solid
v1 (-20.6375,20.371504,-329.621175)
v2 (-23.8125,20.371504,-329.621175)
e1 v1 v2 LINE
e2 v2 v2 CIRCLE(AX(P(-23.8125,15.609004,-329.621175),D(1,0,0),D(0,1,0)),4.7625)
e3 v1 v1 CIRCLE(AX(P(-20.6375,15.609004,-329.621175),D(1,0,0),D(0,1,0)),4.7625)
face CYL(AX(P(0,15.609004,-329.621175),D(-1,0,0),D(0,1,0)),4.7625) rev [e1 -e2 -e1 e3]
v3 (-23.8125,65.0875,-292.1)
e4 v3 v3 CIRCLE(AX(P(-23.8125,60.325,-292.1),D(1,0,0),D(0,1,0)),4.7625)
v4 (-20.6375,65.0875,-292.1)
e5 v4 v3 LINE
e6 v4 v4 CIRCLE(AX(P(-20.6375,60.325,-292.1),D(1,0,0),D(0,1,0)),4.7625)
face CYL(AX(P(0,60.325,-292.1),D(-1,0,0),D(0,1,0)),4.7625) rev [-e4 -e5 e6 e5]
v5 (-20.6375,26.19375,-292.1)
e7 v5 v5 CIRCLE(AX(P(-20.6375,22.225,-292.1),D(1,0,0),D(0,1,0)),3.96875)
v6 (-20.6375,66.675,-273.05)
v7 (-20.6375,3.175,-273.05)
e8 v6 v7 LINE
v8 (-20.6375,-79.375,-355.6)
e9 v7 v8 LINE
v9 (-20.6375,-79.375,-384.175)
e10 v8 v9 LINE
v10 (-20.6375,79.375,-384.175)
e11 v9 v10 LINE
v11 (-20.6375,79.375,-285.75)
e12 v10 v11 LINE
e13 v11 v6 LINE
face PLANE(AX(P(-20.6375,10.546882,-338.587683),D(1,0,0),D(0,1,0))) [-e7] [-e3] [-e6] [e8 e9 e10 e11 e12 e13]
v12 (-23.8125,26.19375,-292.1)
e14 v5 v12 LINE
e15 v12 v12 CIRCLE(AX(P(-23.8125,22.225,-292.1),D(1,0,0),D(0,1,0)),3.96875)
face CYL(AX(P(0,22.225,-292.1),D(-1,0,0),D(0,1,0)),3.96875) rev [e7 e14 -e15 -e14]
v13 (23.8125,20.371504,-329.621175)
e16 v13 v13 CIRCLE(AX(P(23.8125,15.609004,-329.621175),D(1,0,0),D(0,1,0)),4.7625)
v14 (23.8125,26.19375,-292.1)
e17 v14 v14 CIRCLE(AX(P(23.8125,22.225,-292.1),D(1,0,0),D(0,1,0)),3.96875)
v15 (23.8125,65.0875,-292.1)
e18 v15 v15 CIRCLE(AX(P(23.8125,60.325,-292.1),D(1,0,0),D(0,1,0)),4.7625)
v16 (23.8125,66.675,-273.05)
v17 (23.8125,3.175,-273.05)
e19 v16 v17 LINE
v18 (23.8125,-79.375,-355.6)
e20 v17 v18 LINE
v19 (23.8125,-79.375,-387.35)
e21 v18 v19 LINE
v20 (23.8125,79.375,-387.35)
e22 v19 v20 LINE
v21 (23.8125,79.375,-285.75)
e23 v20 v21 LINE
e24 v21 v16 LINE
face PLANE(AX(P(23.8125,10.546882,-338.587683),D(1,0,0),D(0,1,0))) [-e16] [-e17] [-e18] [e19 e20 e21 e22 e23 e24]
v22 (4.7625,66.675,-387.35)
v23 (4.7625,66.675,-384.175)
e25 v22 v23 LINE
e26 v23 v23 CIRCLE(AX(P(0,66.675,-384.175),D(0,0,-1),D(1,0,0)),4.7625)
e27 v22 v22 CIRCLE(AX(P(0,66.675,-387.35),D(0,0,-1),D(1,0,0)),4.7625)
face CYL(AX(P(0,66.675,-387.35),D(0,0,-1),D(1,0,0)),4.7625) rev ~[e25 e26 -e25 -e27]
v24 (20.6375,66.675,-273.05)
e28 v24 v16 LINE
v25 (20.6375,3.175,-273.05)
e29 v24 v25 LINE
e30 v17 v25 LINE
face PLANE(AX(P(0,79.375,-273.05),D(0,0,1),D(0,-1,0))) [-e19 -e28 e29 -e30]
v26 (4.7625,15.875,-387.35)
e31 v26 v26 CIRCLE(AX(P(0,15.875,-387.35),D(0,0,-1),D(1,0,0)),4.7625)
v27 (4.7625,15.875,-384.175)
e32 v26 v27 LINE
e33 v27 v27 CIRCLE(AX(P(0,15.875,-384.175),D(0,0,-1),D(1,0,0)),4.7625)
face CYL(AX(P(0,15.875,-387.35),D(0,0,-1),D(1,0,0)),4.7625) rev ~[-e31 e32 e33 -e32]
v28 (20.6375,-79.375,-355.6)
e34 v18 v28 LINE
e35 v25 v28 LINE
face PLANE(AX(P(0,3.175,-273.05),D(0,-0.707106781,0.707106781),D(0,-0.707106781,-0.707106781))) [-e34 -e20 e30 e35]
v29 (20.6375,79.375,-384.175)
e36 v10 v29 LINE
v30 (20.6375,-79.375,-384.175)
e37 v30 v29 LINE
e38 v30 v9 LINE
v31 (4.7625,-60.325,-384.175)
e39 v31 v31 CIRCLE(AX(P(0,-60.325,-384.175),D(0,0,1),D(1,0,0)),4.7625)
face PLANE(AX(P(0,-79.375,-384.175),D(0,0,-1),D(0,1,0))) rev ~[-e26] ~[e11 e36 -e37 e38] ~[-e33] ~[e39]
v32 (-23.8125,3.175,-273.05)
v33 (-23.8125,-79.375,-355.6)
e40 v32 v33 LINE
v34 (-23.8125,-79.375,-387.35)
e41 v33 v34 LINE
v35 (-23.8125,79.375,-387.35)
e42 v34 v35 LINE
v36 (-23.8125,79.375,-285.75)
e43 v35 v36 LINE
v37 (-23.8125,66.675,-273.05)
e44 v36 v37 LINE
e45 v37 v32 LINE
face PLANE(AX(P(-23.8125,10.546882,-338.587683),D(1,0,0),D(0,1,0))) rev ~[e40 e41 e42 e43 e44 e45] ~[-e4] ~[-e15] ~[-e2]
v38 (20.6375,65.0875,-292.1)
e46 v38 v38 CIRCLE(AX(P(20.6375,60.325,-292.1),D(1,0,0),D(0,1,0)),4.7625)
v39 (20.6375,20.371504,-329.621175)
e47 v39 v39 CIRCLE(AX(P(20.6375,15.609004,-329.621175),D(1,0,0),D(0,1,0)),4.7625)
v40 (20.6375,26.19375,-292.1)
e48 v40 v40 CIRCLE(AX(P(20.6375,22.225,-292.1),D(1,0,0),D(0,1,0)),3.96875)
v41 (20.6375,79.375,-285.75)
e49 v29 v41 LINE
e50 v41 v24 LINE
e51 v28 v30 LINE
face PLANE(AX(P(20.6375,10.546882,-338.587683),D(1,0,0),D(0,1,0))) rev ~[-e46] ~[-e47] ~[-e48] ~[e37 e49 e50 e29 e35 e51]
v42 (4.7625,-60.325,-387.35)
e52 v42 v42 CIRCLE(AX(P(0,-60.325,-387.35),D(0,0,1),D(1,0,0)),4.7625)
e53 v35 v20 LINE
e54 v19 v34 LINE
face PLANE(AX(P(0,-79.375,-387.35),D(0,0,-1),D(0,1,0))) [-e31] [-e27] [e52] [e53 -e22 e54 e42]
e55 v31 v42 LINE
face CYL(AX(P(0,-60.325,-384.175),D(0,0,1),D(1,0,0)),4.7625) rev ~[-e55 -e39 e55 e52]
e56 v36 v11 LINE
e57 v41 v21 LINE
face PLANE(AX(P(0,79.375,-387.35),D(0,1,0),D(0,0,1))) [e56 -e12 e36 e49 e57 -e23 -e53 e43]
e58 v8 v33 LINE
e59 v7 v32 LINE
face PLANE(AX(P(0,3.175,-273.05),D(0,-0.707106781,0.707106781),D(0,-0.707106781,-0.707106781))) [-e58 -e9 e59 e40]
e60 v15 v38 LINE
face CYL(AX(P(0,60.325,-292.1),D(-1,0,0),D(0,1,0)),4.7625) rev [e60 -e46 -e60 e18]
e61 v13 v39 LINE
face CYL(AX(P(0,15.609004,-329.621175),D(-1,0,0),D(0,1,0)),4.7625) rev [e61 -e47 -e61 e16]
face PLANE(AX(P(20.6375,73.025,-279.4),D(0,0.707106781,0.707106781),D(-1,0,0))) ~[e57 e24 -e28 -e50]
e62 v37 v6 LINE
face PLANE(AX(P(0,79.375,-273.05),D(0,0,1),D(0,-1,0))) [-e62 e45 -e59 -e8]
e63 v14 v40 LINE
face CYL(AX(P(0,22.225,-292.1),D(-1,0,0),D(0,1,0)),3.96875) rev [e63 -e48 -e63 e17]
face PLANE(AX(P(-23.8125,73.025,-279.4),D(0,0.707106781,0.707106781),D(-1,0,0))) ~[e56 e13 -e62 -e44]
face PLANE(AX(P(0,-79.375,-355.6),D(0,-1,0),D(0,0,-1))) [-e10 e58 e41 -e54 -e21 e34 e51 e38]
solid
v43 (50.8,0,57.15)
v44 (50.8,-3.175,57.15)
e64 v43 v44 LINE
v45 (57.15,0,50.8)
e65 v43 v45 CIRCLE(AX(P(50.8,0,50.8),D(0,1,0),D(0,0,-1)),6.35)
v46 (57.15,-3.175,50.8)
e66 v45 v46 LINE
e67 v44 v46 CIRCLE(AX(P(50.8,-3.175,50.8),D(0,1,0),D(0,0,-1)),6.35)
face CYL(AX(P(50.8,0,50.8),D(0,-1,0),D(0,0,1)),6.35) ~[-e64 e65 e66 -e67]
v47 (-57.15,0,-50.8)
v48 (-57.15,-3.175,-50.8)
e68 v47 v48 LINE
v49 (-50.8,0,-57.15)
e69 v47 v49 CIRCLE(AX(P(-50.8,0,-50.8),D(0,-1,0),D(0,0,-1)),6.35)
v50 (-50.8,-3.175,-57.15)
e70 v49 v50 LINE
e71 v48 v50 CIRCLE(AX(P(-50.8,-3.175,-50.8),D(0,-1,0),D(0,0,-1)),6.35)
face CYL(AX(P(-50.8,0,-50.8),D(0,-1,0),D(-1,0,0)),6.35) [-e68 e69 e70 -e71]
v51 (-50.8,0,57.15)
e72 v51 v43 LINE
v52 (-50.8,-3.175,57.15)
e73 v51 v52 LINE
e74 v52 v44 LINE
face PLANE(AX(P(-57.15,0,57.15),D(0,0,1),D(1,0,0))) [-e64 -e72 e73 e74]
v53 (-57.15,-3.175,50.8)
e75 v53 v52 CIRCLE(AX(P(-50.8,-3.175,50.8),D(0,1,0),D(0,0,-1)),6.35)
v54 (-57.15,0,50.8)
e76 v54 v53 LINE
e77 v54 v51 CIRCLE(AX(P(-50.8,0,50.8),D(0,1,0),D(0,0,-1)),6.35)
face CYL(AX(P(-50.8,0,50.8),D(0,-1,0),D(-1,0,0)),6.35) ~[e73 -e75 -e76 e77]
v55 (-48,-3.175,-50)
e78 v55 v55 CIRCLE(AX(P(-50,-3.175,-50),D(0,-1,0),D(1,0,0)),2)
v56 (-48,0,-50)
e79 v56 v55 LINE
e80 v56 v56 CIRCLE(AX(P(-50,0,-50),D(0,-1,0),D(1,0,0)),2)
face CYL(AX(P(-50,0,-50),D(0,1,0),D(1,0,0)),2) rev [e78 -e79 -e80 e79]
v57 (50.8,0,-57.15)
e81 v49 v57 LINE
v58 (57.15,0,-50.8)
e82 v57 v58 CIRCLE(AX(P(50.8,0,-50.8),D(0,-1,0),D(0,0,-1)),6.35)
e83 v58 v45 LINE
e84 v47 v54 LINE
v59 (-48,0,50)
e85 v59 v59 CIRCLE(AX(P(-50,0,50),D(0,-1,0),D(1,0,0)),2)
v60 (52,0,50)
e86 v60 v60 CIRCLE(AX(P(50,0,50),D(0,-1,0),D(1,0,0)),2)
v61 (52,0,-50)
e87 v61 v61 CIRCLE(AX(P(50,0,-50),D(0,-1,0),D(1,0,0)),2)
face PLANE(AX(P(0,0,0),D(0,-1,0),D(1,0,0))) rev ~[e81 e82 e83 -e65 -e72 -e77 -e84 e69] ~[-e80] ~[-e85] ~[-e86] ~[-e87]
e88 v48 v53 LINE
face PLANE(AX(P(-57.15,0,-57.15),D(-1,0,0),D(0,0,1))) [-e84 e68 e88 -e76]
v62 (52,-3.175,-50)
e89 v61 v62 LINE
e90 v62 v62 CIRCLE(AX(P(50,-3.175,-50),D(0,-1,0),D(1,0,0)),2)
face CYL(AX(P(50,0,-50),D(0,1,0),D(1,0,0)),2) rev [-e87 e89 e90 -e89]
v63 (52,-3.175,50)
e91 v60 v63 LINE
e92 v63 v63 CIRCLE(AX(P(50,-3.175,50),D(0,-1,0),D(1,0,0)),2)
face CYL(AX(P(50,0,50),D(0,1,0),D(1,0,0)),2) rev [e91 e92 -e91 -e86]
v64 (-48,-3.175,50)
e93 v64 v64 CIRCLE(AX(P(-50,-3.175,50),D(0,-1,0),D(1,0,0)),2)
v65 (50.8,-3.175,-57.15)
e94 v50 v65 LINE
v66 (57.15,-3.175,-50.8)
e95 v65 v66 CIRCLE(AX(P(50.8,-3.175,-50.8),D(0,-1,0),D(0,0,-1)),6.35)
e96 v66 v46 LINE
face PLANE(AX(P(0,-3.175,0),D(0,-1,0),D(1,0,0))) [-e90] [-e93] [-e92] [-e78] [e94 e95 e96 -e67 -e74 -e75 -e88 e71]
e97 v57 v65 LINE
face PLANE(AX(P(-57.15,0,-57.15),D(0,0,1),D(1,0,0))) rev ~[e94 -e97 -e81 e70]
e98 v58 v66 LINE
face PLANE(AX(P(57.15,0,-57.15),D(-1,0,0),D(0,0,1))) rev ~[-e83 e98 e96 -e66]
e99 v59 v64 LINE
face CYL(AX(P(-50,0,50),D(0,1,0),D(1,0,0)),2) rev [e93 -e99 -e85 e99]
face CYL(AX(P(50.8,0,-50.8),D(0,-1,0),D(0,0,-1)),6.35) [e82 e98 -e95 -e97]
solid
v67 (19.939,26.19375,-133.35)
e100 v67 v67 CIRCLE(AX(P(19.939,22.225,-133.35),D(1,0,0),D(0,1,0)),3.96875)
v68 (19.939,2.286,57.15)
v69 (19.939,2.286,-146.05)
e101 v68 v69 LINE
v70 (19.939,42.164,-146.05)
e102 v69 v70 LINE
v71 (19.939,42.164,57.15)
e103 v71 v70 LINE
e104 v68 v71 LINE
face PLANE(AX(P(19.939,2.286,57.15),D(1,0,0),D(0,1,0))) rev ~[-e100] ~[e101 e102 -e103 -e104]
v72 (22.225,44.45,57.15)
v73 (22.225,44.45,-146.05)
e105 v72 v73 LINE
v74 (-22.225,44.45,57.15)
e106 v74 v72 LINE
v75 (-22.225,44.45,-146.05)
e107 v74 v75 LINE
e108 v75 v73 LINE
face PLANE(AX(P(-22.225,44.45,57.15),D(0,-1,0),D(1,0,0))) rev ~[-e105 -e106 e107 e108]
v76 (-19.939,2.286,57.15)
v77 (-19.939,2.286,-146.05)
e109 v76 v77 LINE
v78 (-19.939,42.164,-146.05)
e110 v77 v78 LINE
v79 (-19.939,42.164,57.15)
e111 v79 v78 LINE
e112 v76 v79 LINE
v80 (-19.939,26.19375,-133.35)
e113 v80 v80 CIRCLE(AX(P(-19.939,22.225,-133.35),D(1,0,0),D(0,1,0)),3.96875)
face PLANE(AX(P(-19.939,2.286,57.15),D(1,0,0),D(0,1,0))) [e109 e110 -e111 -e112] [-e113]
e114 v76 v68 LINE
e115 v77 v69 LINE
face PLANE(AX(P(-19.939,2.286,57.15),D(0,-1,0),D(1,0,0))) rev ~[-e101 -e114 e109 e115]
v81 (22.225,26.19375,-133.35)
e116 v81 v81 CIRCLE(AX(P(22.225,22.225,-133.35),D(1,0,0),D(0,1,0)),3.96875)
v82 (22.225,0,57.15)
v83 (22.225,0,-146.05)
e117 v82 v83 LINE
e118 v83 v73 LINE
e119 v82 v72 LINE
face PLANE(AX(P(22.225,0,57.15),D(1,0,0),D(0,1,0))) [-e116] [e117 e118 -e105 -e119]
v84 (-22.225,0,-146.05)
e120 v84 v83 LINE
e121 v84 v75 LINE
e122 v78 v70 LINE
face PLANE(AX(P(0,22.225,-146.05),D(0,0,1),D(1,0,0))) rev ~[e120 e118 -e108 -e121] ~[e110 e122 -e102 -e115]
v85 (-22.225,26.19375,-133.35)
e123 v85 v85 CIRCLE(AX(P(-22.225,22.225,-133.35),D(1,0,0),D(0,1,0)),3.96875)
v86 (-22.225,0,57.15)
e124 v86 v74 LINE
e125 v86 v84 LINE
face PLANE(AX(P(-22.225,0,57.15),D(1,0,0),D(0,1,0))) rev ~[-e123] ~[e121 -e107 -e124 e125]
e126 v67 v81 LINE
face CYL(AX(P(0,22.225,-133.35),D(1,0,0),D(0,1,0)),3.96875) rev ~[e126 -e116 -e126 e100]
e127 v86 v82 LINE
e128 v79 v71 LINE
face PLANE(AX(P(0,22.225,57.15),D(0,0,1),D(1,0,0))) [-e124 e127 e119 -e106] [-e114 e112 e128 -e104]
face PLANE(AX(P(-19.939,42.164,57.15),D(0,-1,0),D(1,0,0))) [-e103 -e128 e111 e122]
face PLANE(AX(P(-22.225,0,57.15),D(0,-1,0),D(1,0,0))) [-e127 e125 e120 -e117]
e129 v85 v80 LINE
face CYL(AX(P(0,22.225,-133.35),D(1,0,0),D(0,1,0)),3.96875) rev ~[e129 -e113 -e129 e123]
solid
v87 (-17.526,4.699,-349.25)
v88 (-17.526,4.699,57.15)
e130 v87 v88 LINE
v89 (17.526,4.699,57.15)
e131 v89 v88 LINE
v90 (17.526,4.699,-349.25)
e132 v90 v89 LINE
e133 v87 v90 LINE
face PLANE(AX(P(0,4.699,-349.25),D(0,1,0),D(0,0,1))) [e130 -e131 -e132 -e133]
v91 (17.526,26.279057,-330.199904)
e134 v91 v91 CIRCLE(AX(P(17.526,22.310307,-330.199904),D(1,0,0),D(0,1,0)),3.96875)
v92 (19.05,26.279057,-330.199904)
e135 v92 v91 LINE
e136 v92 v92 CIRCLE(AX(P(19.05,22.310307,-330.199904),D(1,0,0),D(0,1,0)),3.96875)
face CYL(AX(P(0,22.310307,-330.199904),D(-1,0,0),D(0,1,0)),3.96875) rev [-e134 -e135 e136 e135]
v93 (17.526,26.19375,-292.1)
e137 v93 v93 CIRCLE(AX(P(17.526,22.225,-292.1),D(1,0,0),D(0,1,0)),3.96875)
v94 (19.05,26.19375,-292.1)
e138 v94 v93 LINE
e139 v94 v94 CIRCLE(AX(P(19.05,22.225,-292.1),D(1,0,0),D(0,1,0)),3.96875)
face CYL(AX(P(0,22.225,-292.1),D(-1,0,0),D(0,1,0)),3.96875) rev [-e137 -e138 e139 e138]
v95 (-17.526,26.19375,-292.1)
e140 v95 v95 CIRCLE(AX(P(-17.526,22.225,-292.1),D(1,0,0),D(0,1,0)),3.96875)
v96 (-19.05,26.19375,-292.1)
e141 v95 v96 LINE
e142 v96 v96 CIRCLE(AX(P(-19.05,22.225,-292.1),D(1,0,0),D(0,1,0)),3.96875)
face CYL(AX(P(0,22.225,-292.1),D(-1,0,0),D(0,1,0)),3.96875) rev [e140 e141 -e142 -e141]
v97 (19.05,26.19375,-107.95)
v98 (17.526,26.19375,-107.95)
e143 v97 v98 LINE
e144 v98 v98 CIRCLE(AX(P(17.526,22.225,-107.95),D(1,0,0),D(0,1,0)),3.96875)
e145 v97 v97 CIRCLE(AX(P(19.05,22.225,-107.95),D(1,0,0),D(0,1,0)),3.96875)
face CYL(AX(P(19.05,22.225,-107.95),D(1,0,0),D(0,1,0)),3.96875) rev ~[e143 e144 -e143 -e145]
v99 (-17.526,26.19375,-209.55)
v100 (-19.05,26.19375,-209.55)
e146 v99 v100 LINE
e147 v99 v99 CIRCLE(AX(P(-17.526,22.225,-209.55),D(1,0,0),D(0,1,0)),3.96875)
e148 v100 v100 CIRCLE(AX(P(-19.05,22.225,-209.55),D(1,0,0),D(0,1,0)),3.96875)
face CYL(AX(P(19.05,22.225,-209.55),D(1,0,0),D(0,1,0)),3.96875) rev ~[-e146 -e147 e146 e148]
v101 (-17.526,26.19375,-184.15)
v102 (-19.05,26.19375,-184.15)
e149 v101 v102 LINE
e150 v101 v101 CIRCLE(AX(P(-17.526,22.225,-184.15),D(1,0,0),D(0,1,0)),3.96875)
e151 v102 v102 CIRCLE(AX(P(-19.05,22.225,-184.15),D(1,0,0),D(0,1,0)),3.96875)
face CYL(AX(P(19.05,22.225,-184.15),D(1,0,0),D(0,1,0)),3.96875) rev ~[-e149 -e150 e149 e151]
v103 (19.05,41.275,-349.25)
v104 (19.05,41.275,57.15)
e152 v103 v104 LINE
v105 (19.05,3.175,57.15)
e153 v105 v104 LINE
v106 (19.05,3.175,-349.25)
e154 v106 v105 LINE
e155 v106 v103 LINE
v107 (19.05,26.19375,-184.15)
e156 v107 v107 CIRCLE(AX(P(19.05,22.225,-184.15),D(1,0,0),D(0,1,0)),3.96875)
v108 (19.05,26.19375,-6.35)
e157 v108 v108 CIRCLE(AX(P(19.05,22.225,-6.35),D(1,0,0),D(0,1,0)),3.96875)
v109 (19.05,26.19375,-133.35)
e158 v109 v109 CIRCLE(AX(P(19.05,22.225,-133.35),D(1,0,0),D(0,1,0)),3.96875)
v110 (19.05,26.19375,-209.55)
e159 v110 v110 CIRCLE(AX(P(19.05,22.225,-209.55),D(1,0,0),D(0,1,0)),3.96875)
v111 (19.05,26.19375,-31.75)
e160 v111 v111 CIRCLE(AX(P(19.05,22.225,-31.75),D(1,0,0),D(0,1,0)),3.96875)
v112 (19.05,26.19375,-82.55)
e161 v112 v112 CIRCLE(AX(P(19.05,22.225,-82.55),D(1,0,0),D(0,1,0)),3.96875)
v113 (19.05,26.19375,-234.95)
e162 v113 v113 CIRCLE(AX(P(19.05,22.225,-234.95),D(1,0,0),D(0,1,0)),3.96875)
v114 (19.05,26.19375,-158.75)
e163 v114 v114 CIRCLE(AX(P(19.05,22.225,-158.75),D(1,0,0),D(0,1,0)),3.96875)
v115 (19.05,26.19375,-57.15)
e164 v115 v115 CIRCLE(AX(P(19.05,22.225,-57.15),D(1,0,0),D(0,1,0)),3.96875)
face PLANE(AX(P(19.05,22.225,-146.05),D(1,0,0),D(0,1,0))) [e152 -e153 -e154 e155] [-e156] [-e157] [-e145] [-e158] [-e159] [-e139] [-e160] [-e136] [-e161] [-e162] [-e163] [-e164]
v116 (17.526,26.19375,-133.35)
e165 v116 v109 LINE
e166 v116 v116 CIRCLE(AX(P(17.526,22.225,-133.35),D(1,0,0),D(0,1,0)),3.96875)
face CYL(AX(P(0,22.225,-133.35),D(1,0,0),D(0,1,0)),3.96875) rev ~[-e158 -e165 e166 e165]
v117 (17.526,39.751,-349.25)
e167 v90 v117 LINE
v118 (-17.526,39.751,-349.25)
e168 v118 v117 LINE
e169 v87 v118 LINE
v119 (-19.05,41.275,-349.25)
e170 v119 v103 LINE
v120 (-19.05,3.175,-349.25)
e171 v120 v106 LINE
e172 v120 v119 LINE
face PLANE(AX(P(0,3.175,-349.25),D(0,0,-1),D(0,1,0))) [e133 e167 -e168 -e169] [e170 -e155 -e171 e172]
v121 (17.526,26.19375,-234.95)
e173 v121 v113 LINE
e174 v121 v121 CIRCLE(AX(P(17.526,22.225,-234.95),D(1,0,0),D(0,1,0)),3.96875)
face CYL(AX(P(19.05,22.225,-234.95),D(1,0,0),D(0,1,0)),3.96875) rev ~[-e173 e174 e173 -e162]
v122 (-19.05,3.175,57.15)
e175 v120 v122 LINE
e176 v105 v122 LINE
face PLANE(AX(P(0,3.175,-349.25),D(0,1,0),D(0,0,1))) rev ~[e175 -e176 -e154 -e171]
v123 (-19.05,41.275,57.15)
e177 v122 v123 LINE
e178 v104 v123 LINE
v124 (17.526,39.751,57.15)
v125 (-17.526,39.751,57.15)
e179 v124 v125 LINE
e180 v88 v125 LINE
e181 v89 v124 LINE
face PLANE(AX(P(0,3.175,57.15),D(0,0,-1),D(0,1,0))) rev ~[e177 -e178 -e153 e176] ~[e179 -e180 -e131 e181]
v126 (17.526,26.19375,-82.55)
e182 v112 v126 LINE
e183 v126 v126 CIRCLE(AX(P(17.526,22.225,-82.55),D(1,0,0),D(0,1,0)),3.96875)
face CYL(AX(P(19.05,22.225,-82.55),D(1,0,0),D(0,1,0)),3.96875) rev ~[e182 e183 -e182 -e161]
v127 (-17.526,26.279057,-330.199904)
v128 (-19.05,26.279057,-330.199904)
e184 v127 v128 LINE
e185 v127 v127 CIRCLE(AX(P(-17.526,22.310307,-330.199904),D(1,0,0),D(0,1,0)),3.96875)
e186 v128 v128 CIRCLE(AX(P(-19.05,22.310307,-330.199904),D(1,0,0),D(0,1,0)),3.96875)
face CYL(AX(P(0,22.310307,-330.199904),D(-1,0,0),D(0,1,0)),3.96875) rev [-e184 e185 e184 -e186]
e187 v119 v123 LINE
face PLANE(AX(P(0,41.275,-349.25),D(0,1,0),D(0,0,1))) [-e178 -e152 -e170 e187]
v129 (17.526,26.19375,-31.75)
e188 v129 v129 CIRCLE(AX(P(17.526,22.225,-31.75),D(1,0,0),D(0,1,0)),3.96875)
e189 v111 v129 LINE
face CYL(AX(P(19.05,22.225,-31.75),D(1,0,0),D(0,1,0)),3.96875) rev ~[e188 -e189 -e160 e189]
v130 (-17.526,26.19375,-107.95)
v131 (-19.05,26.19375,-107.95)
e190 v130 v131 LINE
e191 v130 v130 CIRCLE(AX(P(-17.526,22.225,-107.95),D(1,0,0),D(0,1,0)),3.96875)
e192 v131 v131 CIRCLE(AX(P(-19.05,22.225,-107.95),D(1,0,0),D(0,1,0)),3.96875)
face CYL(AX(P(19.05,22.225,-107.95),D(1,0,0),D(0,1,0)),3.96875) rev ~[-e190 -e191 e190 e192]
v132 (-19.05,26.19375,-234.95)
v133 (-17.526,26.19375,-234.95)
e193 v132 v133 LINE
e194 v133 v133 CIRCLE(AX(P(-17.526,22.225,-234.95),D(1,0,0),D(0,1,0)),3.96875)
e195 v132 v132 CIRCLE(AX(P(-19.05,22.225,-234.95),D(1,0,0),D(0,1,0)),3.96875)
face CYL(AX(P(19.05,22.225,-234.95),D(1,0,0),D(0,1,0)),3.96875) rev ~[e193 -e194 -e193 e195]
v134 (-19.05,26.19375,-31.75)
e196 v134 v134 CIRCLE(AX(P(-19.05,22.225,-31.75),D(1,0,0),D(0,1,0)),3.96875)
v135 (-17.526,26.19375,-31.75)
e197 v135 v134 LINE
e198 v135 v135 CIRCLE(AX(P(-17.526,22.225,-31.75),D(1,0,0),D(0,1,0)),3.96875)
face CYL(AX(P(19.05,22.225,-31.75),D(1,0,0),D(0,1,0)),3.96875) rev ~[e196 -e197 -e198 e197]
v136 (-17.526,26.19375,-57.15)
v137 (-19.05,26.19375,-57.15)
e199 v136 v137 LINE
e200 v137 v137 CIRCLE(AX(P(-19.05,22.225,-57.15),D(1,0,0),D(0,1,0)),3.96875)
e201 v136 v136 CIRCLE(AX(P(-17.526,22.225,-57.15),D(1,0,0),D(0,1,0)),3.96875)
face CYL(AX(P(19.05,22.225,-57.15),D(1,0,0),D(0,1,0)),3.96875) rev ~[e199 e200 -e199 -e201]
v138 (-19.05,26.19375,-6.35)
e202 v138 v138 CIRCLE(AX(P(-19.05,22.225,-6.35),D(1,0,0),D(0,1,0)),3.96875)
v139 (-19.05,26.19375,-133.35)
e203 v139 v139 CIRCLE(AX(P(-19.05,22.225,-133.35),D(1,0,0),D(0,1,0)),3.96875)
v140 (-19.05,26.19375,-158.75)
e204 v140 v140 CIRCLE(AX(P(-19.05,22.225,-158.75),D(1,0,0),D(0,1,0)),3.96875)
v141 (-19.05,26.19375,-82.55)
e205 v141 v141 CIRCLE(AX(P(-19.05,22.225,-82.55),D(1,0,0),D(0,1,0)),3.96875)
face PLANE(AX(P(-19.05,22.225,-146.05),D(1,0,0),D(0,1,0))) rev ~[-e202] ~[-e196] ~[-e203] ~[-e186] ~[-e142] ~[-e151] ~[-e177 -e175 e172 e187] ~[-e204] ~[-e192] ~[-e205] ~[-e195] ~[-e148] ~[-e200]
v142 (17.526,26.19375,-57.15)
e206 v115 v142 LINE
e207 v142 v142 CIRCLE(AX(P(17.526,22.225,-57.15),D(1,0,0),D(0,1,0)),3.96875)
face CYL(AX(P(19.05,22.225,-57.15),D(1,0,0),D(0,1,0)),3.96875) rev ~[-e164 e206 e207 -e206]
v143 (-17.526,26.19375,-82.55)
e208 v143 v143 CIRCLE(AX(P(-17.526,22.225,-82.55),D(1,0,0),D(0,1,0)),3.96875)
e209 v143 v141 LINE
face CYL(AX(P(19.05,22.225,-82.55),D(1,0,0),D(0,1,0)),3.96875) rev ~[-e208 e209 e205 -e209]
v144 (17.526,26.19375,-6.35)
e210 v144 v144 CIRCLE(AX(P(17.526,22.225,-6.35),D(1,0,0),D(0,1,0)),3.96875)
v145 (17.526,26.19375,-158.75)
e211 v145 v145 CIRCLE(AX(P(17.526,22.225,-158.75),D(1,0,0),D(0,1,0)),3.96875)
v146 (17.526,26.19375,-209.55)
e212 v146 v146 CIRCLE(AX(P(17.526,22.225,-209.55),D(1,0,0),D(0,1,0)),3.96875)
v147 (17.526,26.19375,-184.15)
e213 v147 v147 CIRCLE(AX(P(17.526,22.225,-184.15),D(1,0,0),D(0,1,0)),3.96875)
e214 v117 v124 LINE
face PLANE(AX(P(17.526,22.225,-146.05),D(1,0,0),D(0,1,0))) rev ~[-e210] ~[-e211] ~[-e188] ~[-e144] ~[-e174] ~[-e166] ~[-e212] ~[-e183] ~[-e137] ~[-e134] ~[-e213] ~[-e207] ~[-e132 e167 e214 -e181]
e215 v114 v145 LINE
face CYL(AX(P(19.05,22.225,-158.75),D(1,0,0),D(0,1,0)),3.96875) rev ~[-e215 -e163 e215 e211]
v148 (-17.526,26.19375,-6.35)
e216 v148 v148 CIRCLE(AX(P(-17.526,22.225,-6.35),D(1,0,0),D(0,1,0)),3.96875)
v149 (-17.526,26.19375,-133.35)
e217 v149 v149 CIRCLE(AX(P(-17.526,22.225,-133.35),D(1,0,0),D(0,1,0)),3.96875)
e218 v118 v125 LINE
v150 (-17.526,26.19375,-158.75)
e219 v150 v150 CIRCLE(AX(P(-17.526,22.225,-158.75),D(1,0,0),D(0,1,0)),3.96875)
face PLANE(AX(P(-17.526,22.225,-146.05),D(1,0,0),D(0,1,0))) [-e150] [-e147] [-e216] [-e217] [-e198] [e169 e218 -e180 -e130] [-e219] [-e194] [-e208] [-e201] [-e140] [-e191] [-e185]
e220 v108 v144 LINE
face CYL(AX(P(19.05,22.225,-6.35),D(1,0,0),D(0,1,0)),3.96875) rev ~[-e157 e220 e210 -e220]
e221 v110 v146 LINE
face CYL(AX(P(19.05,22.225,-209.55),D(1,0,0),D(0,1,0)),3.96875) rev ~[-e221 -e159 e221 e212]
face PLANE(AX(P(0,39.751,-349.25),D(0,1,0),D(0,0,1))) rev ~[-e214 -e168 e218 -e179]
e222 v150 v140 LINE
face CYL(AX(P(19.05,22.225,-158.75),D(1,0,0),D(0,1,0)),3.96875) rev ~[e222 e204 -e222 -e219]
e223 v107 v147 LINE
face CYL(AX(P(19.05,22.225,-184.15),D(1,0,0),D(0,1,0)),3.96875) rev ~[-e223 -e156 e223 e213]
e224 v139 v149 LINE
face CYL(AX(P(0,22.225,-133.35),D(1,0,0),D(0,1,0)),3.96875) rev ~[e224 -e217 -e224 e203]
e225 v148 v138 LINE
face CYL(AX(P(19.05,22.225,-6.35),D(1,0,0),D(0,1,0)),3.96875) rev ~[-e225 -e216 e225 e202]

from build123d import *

# Parameters (mm, degrees)
F0_W      = 114.3
F0_H      = 114.3
F0_R      = 2
F1_DEPTH  = 3.175
F2_R      = 6.35
F3_W      = 44.45
F3_H      = 44.45
F3_W_2    = 39.878
F3_H_2    = 39.878
F4_DEPTH  = 203.2
F6_R      = 4.7625
F6_R_2    = 3.96875
F7_DEPTH  = 23.8125
F8_T      = -3.175
F9_W      = 38.1
F9_H      = 406.4
F9_R      = 3.96875
F10_DEPTH = 19.05
F11_T     = -1.524
F12_R     = 3.96875
F13_DEPTH = 50.8
F14_R     = 3.96875
F15_DEPTH = 50.8
F16_R     = 4.7625
F17_DEPTH = 25.4
F18_R     = 4.7625
F19_DEPTH = 25.4
F20_SIZE  = 12.7


with BuildPart() as f1:
    # F0 (on Front) → F1 (new body)
    with BuildSketch(Plane.XZ):
        Rectangle(F0_W, F0_H)
        with Locations((-50, -50)):
            Circle(F0_R, mode=Mode.SUBTRACT)
        with Locations((50, -50)):
            Circle(F0_R, mode=Mode.SUBTRACT)
        with Locations((-50, 50)):
            Circle(F0_R, mode=Mode.SUBTRACT)
        with Locations((50, 50)):
            Circle(F0_R, mode=Mode.SUBTRACT)
    extrude(amount=F1_DEPTH)

    # F2
    f2_edges = [f1.edges().sort_by_distance(p)[0] for p in [
        (-57.15, -1.5875, 57.15),
        (57.15, -1.5875, 57.15),
        (-57.15, -1.5875, -57.15),
        (57.15, -1.5875, -57.15),
    ]]
    fillet(f2_edges, radius=F2_R)


with BuildPart() as f4:
    # F3 (on face) → F4 (new body)
    with BuildSketch(Plane.XY.offset(57.15)):
        with Locations((0, 22.225)):
            Rectangle(F3_W, F3_H)
        with Locations((0, 22.225)):
            Rectangle(F3_W_2, F3_H_2, mode=Mode.SUBTRACT)
    extrude(amount=-F4_DEPTH)


with BuildPart() as f7:
    # F6 (on Right) → F7 (new body, symmetric)
    with BuildSketch(Plane.YZ):
        Polygon((-79.375, -387.35), (3.175, -387.35), (79.375, -387.35), (79.375, -273.05), (3.175, -273.05), (-79.375, -355.6), align=None)
        with Locations((15.6090044309, -329.6211753898)):
            Circle(F6_R, mode=Mode.SUBTRACT)
        with Locations((22.225, -292.1)):
            Circle(F6_R_2, mode=Mode.SUBTRACT)
        with Locations((60.325, -292.1)):
            Circle(F6_R, mode=Mode.SUBTRACT)
    extrude(amount=F7_DEPTH, both=True)

    # F8
    f8_openings = [f7.faces().sort_by_distance(p)[0] for p in [
        (0, 79.375, -330.2),
        (0, 41.275, -273.05),
        (0, 10.846504, -329.621175),
        (0, 18.25625, -292.1),
        (0, 55.5625, -292.1),
        (0, -79.375, -371.475),
        (0, -38.1, -314.325),
    ]]
    offset(amount=F8_T, openings=f8_openings)

    # F16 (on face) → F17 (cut)
    with BuildSketch(Plane(origin=(0, 0, -387.35), x_dir=(1, 0, 0), z_dir=(0, 0, -1))):
        with Locations((0, -15.875)):
            Circle(F16_R)
        with Locations((0, -66.675)):
            Circle(F16_R)
    extrude(amount=-F17_DEPTH, mode=Mode.SUBTRACT)

    # F18 (on face) → F19 (cut)
    with BuildSketch(Plane.XY.offset(-384.175)):
        with Locations((0, -60.325)):
            Circle(F18_R)
    extrude(amount=-F19_DEPTH, mode=Mode.SUBTRACT)

    # F20
    f20_edges = [f7.edges().sort_by_distance(p)[0] for p in [
        (-22.225, 79.375, -273.05),
        (22.225, 79.375, -273.05),
    ]]
    chamfer(f20_edges, length=F20_SIZE)


with BuildPart() as f10:
    # F9 (on Right) → F10 (new body, symmetric)
    with BuildSketch(Plane.YZ):
        with Locations((22.225, -146.05)):
            Rectangle(F9_W, F9_H)
        with Locations((22.310306693, -330.1999044981)):
            Circle(F9_R, mode=Mode.SUBTRACT)
        with Locations((22.225, -292.1)):
            Circle(F9_R, mode=Mode.SUBTRACT)
    extrude(amount=F10_DEPTH, both=True)

    # F11
    f11_openings = [f10.faces().sort_by_distance(p)[0] for p in [
        (0, 22.225, 57.15),
        (0, 18.25625, -292.1),
        (0, 22.225, -349.25),
        (0, 18.341557, -330.199904),
    ]]
    offset(amount=F11_T, openings=f11_openings)


with BuildPart() as f13_tool:
    # F12 (on Right) → F13 (new body, symmetric)
    with BuildSketch(Plane.YZ):
        with Locations((22.225, -133.35)):
            Circle(F12_R)
    extrude(amount=F13_DEPTH, both=True)


with BuildPart() as f4_1:
    add(f4.part)

    # F13: cut by f13_tool
    add(f13_tool.part, mode=Mode.SUBTRACT)


with BuildPart() as f10_1:
    add(f10.part)

    # F13: cut by f13_tool
    add(f13_tool.part, mode=Mode.SUBTRACT)

    # F14 (on face) → F15 (cut, symmetric)
    with BuildSketch(Plane.YZ.offset(19.05)):
        with Locations((22.225, -6.35)):
            Circle(F14_R)
        with Locations((22.225, -31.75)):
            Circle(F14_R)
        with Locations((22.225, -57.15)):
            Circle(F14_R)
        with Locations((22.225, -82.55)):
            Circle(F14_R)
        with Locations((22.225, -107.95)):
            Circle(F14_R)
        with Locations((22.225, -133.35)):
            Circle(F14_R)
        with Locations((22.225, -158.75)):
            Circle(F14_R)
        with Locations((22.225, -184.15)):
            Circle(F14_R)
        with Locations((22.225, -209.55)):
            Circle(F14_R)
        with Locations((22.225, -234.95)):
            Circle(F14_R)
    extrude(amount=F15_DEPTH, both=True, mode=Mode.SUBTRACT)


solid = Compound([f1.part, f7.part, f4_1.part, f10_1.part])
